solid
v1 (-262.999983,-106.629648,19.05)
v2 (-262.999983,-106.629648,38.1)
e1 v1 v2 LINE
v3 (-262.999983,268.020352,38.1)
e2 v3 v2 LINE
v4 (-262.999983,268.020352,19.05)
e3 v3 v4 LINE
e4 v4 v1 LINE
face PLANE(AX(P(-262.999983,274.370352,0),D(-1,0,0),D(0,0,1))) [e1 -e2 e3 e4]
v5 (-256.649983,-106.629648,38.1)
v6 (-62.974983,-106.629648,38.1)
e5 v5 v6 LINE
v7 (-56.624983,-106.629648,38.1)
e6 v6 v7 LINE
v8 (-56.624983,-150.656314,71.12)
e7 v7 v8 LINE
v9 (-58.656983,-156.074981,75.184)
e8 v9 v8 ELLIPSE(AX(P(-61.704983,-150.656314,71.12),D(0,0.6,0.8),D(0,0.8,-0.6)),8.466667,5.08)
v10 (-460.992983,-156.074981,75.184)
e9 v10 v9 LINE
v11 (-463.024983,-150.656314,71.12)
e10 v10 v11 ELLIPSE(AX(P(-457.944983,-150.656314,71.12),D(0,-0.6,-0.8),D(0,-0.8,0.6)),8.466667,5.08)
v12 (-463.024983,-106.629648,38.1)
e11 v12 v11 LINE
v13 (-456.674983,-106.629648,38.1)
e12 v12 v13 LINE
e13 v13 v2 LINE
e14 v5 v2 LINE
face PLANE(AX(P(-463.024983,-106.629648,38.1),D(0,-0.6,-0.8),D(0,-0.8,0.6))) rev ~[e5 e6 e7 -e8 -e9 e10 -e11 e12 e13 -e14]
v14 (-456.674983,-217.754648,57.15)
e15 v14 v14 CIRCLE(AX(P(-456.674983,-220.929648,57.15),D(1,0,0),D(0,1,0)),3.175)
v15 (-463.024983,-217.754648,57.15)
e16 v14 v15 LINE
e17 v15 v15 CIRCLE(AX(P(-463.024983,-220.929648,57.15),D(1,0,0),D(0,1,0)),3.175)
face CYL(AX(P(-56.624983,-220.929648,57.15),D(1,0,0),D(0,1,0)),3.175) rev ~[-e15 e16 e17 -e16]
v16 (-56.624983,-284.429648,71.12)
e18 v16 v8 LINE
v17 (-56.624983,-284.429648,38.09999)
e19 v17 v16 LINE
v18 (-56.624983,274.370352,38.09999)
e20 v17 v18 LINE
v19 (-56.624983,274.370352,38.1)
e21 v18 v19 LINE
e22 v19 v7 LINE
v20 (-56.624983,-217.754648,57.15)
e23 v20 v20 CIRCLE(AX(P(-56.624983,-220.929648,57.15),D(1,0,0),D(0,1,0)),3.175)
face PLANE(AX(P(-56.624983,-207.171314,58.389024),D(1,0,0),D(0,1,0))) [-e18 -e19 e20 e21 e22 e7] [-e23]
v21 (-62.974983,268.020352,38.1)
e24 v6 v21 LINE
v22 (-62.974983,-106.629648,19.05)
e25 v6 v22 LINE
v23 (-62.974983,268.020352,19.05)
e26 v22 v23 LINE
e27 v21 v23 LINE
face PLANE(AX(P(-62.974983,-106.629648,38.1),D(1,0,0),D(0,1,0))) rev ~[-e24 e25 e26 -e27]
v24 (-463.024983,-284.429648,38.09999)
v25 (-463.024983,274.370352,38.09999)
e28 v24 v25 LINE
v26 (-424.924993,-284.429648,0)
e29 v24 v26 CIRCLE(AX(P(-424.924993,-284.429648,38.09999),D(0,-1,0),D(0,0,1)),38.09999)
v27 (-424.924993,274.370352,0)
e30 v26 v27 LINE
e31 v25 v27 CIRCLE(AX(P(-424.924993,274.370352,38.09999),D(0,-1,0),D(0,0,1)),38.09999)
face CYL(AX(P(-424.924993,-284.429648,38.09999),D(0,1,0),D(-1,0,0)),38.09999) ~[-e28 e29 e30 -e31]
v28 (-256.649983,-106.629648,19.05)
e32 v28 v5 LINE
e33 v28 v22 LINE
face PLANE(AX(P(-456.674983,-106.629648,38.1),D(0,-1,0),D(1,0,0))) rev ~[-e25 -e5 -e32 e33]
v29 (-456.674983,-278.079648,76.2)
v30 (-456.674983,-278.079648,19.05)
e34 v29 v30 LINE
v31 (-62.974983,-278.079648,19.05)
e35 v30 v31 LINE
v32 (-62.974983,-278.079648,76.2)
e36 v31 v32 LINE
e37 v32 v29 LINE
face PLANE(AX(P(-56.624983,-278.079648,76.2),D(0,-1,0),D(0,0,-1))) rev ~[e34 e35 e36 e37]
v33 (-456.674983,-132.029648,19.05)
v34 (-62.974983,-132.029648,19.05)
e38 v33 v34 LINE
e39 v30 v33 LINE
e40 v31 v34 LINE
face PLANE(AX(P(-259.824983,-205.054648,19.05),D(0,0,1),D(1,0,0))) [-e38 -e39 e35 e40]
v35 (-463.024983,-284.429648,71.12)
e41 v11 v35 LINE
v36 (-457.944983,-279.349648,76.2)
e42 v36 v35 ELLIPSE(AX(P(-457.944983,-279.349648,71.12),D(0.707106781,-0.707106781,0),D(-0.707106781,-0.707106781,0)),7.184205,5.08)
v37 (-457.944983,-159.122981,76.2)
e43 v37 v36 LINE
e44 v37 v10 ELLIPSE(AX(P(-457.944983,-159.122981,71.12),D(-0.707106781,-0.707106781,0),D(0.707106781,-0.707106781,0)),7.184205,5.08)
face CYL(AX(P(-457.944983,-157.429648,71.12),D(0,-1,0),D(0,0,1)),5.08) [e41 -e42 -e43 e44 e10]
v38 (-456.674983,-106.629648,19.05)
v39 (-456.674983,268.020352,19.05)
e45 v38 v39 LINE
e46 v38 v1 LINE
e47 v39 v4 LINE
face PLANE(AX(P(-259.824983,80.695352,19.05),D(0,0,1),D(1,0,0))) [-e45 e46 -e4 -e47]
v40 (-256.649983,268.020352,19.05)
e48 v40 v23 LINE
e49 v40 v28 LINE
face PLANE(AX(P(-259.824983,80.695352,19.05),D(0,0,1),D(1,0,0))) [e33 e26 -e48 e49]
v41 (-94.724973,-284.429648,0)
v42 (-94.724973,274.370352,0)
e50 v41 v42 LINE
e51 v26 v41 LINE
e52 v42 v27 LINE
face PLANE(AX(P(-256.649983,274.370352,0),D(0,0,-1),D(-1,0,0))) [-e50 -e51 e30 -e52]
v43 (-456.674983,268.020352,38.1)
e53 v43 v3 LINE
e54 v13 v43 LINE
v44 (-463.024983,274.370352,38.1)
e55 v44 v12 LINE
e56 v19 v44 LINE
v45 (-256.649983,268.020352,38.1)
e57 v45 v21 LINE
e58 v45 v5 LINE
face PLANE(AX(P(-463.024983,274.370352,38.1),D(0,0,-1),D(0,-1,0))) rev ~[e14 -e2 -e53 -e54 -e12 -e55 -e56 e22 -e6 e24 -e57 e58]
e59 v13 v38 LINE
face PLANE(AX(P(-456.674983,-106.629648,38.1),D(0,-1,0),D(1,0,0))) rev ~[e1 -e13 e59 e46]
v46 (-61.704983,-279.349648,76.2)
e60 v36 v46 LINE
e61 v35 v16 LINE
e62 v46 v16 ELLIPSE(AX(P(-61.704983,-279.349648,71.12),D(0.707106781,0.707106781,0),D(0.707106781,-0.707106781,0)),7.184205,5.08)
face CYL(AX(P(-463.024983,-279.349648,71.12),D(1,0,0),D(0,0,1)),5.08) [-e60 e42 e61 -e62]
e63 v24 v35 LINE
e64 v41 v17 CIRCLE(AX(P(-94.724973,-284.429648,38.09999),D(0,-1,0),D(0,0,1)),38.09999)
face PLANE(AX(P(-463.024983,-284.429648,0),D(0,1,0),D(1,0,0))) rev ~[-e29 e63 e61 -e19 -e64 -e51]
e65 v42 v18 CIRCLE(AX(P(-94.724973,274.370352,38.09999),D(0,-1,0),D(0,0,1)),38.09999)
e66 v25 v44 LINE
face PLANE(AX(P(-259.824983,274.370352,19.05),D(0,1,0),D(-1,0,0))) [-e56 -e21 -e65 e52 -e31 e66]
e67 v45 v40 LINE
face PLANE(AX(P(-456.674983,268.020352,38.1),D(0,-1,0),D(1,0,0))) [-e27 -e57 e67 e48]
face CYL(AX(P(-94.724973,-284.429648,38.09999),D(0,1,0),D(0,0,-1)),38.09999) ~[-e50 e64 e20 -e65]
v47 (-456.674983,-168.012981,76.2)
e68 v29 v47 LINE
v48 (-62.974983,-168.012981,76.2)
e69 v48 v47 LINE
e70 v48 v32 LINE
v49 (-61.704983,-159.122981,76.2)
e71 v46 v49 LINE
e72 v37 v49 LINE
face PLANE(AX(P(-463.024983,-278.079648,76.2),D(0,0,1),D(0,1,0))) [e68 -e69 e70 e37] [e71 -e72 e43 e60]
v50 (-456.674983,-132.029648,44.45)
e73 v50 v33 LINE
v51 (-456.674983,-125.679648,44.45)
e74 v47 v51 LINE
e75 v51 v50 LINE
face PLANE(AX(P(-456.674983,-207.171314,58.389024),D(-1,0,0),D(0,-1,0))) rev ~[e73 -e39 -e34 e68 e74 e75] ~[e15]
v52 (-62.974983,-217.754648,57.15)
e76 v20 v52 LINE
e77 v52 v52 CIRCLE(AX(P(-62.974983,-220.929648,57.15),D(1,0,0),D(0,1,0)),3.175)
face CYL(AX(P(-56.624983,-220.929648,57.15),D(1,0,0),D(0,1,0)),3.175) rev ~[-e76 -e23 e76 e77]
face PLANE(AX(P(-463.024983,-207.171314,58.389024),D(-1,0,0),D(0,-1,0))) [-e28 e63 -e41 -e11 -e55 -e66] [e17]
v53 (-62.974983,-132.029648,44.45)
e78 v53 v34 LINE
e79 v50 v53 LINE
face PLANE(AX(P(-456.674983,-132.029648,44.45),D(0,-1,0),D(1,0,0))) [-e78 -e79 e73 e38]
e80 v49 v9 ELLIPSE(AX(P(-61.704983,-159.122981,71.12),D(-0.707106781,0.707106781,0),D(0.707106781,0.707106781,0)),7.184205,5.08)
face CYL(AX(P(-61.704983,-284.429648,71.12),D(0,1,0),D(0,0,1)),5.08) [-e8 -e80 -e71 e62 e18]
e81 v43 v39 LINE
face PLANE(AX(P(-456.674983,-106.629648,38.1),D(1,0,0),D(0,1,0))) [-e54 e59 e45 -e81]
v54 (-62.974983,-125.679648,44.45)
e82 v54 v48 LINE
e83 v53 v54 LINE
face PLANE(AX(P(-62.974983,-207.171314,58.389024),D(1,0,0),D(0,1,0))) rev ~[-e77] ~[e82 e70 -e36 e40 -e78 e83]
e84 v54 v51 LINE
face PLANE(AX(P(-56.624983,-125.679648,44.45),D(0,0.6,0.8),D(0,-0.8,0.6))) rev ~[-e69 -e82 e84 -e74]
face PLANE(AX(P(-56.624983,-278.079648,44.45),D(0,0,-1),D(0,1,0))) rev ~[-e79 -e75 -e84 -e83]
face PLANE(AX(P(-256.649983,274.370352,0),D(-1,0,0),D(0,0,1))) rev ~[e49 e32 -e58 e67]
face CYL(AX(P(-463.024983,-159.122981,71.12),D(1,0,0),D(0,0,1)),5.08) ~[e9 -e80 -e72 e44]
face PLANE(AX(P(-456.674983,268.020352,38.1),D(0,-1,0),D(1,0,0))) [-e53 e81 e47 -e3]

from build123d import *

# Parameters (mm, degrees)
F0_W          = 406.4
F0_H          = 558.8
F1_DEPTH      = 76.2
F3_DEPTH      = 406.4
F4_R          = 38.09999
F5_W          = 393.7
F5_H          = 374.65
F6_DEPTH      = 19.05
F8_DEPTH      = 406.4
F8_DEPTH_BACK = 6.35
F9_W          = 393.7
F9_H          = 146.05
F10_DEPTH     = 25.4
F12_DEPTH     = 6.35
F14_DEPTH     = 6.35
F15_R         = 3.175
F16_DEPTH     = 406.401
F17_R         = 5.08
F18_W         = 6.35
F18_H         = 38.1
F19_DEPTH     = 381


# Not quite as in the source:
# - a fillet or chamfer is up to 0.001 mm smaller than in the source, because OpenCascade refuses the exact size


with BuildPart() as f1:
    # F0 (on Top) → F1 (new body)
    with BuildSketch(Plane.XY):
        with Locations((-259.8249833828, -5.0296476896)):
            Rectangle(F0_W, F0_H)
    extrude(amount=F1_DEPTH)

    # F2 (on face) → F3 (cut)
    with BuildSketch(Plane(origin=(-463.0249833828, 0, 0), x_dir=(0, -1, 0), z_dir=(-1, 0, 0))):
        Polygon((5.0296476896, 76.2), (-147.3703523104, 76.2), (-96.5703523104, 38.1), (5.0296476896, 38.1), align=None)
        Polygon((157.4296476896, 76.2), (5.0296476896, 76.2), (5.0296476896, 38.1), (106.6296476896, 38.1), align=None)
        Polygon((-147.3703523104, 76.2), (-274.3703523104, 76.2), (-274.3703523104, 38.1), (-96.5703523104, 38.1), align=None)
    extrude(amount=-F3_DEPTH, mode=Mode.SUBTRACT)

    # F4 (radius 38.1 in the source; OpenCascade refuses exactly that, so slightly less here)
    f4_edges = [f1.edges().sort_by_distance(p)[0] for p in [
        (-56.624983, -5.029648, 0),
        (-463.024983, -5.029648, 0),
    ]]
    fillet(f4_edges, radius=F4_R)

    # F5 (on face) → F6 (cut)
    with BuildSketch(Plane.XY.offset(38.1)):
        with Locations((-259.8249833828, 80.6953523104)):
            Rectangle(F5_W, F5_H)
    extrude(amount=-F6_DEPTH, mode=Mode.SUBTRACT)

    # F7 (on face) → F8 (cut, two sides)
    with BuildSketch(Plane.YZ.offset(-56.6249833828)) as f8_sk:
        Polygon((-278.0796476896, 76.2), (-278.0796476896, 44.45), (-125.6796476896, 44.45), (-168.012981023, 76.2), align=None)
    extrude(amount=-F8_DEPTH, mode=Mode.SUBTRACT)
    extrude(f8_sk.sketch, amount=F8_DEPTH_BACK, mode=Mode.SUBTRACT)

    # F9 (on face) → F10 (cut)
    with BuildSketch(Plane.XY.offset(44.45)):
        with Locations((-259.8249833828, -205.0546476896)):
            Rectangle(F9_W, F9_H)
    extrude(amount=-F10_DEPTH, mode=Mode.SUBTRACT)

    # F11 (on face) → F12 (join)
    with BuildSketch(Plane.YZ.offset(-56.6249833828)):
        Polygon((-168.012981023, 76.2), (-278.0796476896, 76.2), (-278.0796476896, 44.45), (-125.6796476896, 44.45), align=None)
    extrude(amount=-F12_DEPTH)

    # F13 (on face) → F14 (join)
    with BuildSketch(Plane(origin=(-463.0249833828, 0, 0), x_dir=(0, -1, 0), z_dir=(-1, 0, 0))):
        Polygon((168.012981023, 76.2), (125.6796476896, 44.45), (278.0796476896, 44.45), (278.0796476896, 76.2), align=None)
    extrude(amount=-F14_DEPTH)

    # F15 (on face) → F16 (cut, through all)
    with BuildSketch(Plane.YZ.offset(-56.6249833828)):
        with Locations((-220.9296476896, 57.15)):
            Circle(F15_R)
    extrude(amount=-F16_DEPTH, mode=Mode.SUBTRACT)

    # F17
    f17_edges = [f1.edges().sort_by_distance(p)[0] for p in [
        (-463.024983, -220.929648, 76.2),
        (-259.824983, -157.429648, 76.2),
        (-259.824983, -284.429648, 76.2),
        (-56.624983, -220.929648, 76.2),
    ]]
    fillet(f17_edges, radius=F17_R)

    # F18 (on face) → F19 (join, through all)
    with BuildSketch(Plane(origin=(0, 274.3703523104, 0), x_dir=(-1, 0, 0), z_dir=(0, 1, 0))):
        with Locations((259.8249833828, 19.05)):
            Rectangle(F18_W, F18_H)
    extrude(amount=-F19_DEPTH)


solid = f1.part
